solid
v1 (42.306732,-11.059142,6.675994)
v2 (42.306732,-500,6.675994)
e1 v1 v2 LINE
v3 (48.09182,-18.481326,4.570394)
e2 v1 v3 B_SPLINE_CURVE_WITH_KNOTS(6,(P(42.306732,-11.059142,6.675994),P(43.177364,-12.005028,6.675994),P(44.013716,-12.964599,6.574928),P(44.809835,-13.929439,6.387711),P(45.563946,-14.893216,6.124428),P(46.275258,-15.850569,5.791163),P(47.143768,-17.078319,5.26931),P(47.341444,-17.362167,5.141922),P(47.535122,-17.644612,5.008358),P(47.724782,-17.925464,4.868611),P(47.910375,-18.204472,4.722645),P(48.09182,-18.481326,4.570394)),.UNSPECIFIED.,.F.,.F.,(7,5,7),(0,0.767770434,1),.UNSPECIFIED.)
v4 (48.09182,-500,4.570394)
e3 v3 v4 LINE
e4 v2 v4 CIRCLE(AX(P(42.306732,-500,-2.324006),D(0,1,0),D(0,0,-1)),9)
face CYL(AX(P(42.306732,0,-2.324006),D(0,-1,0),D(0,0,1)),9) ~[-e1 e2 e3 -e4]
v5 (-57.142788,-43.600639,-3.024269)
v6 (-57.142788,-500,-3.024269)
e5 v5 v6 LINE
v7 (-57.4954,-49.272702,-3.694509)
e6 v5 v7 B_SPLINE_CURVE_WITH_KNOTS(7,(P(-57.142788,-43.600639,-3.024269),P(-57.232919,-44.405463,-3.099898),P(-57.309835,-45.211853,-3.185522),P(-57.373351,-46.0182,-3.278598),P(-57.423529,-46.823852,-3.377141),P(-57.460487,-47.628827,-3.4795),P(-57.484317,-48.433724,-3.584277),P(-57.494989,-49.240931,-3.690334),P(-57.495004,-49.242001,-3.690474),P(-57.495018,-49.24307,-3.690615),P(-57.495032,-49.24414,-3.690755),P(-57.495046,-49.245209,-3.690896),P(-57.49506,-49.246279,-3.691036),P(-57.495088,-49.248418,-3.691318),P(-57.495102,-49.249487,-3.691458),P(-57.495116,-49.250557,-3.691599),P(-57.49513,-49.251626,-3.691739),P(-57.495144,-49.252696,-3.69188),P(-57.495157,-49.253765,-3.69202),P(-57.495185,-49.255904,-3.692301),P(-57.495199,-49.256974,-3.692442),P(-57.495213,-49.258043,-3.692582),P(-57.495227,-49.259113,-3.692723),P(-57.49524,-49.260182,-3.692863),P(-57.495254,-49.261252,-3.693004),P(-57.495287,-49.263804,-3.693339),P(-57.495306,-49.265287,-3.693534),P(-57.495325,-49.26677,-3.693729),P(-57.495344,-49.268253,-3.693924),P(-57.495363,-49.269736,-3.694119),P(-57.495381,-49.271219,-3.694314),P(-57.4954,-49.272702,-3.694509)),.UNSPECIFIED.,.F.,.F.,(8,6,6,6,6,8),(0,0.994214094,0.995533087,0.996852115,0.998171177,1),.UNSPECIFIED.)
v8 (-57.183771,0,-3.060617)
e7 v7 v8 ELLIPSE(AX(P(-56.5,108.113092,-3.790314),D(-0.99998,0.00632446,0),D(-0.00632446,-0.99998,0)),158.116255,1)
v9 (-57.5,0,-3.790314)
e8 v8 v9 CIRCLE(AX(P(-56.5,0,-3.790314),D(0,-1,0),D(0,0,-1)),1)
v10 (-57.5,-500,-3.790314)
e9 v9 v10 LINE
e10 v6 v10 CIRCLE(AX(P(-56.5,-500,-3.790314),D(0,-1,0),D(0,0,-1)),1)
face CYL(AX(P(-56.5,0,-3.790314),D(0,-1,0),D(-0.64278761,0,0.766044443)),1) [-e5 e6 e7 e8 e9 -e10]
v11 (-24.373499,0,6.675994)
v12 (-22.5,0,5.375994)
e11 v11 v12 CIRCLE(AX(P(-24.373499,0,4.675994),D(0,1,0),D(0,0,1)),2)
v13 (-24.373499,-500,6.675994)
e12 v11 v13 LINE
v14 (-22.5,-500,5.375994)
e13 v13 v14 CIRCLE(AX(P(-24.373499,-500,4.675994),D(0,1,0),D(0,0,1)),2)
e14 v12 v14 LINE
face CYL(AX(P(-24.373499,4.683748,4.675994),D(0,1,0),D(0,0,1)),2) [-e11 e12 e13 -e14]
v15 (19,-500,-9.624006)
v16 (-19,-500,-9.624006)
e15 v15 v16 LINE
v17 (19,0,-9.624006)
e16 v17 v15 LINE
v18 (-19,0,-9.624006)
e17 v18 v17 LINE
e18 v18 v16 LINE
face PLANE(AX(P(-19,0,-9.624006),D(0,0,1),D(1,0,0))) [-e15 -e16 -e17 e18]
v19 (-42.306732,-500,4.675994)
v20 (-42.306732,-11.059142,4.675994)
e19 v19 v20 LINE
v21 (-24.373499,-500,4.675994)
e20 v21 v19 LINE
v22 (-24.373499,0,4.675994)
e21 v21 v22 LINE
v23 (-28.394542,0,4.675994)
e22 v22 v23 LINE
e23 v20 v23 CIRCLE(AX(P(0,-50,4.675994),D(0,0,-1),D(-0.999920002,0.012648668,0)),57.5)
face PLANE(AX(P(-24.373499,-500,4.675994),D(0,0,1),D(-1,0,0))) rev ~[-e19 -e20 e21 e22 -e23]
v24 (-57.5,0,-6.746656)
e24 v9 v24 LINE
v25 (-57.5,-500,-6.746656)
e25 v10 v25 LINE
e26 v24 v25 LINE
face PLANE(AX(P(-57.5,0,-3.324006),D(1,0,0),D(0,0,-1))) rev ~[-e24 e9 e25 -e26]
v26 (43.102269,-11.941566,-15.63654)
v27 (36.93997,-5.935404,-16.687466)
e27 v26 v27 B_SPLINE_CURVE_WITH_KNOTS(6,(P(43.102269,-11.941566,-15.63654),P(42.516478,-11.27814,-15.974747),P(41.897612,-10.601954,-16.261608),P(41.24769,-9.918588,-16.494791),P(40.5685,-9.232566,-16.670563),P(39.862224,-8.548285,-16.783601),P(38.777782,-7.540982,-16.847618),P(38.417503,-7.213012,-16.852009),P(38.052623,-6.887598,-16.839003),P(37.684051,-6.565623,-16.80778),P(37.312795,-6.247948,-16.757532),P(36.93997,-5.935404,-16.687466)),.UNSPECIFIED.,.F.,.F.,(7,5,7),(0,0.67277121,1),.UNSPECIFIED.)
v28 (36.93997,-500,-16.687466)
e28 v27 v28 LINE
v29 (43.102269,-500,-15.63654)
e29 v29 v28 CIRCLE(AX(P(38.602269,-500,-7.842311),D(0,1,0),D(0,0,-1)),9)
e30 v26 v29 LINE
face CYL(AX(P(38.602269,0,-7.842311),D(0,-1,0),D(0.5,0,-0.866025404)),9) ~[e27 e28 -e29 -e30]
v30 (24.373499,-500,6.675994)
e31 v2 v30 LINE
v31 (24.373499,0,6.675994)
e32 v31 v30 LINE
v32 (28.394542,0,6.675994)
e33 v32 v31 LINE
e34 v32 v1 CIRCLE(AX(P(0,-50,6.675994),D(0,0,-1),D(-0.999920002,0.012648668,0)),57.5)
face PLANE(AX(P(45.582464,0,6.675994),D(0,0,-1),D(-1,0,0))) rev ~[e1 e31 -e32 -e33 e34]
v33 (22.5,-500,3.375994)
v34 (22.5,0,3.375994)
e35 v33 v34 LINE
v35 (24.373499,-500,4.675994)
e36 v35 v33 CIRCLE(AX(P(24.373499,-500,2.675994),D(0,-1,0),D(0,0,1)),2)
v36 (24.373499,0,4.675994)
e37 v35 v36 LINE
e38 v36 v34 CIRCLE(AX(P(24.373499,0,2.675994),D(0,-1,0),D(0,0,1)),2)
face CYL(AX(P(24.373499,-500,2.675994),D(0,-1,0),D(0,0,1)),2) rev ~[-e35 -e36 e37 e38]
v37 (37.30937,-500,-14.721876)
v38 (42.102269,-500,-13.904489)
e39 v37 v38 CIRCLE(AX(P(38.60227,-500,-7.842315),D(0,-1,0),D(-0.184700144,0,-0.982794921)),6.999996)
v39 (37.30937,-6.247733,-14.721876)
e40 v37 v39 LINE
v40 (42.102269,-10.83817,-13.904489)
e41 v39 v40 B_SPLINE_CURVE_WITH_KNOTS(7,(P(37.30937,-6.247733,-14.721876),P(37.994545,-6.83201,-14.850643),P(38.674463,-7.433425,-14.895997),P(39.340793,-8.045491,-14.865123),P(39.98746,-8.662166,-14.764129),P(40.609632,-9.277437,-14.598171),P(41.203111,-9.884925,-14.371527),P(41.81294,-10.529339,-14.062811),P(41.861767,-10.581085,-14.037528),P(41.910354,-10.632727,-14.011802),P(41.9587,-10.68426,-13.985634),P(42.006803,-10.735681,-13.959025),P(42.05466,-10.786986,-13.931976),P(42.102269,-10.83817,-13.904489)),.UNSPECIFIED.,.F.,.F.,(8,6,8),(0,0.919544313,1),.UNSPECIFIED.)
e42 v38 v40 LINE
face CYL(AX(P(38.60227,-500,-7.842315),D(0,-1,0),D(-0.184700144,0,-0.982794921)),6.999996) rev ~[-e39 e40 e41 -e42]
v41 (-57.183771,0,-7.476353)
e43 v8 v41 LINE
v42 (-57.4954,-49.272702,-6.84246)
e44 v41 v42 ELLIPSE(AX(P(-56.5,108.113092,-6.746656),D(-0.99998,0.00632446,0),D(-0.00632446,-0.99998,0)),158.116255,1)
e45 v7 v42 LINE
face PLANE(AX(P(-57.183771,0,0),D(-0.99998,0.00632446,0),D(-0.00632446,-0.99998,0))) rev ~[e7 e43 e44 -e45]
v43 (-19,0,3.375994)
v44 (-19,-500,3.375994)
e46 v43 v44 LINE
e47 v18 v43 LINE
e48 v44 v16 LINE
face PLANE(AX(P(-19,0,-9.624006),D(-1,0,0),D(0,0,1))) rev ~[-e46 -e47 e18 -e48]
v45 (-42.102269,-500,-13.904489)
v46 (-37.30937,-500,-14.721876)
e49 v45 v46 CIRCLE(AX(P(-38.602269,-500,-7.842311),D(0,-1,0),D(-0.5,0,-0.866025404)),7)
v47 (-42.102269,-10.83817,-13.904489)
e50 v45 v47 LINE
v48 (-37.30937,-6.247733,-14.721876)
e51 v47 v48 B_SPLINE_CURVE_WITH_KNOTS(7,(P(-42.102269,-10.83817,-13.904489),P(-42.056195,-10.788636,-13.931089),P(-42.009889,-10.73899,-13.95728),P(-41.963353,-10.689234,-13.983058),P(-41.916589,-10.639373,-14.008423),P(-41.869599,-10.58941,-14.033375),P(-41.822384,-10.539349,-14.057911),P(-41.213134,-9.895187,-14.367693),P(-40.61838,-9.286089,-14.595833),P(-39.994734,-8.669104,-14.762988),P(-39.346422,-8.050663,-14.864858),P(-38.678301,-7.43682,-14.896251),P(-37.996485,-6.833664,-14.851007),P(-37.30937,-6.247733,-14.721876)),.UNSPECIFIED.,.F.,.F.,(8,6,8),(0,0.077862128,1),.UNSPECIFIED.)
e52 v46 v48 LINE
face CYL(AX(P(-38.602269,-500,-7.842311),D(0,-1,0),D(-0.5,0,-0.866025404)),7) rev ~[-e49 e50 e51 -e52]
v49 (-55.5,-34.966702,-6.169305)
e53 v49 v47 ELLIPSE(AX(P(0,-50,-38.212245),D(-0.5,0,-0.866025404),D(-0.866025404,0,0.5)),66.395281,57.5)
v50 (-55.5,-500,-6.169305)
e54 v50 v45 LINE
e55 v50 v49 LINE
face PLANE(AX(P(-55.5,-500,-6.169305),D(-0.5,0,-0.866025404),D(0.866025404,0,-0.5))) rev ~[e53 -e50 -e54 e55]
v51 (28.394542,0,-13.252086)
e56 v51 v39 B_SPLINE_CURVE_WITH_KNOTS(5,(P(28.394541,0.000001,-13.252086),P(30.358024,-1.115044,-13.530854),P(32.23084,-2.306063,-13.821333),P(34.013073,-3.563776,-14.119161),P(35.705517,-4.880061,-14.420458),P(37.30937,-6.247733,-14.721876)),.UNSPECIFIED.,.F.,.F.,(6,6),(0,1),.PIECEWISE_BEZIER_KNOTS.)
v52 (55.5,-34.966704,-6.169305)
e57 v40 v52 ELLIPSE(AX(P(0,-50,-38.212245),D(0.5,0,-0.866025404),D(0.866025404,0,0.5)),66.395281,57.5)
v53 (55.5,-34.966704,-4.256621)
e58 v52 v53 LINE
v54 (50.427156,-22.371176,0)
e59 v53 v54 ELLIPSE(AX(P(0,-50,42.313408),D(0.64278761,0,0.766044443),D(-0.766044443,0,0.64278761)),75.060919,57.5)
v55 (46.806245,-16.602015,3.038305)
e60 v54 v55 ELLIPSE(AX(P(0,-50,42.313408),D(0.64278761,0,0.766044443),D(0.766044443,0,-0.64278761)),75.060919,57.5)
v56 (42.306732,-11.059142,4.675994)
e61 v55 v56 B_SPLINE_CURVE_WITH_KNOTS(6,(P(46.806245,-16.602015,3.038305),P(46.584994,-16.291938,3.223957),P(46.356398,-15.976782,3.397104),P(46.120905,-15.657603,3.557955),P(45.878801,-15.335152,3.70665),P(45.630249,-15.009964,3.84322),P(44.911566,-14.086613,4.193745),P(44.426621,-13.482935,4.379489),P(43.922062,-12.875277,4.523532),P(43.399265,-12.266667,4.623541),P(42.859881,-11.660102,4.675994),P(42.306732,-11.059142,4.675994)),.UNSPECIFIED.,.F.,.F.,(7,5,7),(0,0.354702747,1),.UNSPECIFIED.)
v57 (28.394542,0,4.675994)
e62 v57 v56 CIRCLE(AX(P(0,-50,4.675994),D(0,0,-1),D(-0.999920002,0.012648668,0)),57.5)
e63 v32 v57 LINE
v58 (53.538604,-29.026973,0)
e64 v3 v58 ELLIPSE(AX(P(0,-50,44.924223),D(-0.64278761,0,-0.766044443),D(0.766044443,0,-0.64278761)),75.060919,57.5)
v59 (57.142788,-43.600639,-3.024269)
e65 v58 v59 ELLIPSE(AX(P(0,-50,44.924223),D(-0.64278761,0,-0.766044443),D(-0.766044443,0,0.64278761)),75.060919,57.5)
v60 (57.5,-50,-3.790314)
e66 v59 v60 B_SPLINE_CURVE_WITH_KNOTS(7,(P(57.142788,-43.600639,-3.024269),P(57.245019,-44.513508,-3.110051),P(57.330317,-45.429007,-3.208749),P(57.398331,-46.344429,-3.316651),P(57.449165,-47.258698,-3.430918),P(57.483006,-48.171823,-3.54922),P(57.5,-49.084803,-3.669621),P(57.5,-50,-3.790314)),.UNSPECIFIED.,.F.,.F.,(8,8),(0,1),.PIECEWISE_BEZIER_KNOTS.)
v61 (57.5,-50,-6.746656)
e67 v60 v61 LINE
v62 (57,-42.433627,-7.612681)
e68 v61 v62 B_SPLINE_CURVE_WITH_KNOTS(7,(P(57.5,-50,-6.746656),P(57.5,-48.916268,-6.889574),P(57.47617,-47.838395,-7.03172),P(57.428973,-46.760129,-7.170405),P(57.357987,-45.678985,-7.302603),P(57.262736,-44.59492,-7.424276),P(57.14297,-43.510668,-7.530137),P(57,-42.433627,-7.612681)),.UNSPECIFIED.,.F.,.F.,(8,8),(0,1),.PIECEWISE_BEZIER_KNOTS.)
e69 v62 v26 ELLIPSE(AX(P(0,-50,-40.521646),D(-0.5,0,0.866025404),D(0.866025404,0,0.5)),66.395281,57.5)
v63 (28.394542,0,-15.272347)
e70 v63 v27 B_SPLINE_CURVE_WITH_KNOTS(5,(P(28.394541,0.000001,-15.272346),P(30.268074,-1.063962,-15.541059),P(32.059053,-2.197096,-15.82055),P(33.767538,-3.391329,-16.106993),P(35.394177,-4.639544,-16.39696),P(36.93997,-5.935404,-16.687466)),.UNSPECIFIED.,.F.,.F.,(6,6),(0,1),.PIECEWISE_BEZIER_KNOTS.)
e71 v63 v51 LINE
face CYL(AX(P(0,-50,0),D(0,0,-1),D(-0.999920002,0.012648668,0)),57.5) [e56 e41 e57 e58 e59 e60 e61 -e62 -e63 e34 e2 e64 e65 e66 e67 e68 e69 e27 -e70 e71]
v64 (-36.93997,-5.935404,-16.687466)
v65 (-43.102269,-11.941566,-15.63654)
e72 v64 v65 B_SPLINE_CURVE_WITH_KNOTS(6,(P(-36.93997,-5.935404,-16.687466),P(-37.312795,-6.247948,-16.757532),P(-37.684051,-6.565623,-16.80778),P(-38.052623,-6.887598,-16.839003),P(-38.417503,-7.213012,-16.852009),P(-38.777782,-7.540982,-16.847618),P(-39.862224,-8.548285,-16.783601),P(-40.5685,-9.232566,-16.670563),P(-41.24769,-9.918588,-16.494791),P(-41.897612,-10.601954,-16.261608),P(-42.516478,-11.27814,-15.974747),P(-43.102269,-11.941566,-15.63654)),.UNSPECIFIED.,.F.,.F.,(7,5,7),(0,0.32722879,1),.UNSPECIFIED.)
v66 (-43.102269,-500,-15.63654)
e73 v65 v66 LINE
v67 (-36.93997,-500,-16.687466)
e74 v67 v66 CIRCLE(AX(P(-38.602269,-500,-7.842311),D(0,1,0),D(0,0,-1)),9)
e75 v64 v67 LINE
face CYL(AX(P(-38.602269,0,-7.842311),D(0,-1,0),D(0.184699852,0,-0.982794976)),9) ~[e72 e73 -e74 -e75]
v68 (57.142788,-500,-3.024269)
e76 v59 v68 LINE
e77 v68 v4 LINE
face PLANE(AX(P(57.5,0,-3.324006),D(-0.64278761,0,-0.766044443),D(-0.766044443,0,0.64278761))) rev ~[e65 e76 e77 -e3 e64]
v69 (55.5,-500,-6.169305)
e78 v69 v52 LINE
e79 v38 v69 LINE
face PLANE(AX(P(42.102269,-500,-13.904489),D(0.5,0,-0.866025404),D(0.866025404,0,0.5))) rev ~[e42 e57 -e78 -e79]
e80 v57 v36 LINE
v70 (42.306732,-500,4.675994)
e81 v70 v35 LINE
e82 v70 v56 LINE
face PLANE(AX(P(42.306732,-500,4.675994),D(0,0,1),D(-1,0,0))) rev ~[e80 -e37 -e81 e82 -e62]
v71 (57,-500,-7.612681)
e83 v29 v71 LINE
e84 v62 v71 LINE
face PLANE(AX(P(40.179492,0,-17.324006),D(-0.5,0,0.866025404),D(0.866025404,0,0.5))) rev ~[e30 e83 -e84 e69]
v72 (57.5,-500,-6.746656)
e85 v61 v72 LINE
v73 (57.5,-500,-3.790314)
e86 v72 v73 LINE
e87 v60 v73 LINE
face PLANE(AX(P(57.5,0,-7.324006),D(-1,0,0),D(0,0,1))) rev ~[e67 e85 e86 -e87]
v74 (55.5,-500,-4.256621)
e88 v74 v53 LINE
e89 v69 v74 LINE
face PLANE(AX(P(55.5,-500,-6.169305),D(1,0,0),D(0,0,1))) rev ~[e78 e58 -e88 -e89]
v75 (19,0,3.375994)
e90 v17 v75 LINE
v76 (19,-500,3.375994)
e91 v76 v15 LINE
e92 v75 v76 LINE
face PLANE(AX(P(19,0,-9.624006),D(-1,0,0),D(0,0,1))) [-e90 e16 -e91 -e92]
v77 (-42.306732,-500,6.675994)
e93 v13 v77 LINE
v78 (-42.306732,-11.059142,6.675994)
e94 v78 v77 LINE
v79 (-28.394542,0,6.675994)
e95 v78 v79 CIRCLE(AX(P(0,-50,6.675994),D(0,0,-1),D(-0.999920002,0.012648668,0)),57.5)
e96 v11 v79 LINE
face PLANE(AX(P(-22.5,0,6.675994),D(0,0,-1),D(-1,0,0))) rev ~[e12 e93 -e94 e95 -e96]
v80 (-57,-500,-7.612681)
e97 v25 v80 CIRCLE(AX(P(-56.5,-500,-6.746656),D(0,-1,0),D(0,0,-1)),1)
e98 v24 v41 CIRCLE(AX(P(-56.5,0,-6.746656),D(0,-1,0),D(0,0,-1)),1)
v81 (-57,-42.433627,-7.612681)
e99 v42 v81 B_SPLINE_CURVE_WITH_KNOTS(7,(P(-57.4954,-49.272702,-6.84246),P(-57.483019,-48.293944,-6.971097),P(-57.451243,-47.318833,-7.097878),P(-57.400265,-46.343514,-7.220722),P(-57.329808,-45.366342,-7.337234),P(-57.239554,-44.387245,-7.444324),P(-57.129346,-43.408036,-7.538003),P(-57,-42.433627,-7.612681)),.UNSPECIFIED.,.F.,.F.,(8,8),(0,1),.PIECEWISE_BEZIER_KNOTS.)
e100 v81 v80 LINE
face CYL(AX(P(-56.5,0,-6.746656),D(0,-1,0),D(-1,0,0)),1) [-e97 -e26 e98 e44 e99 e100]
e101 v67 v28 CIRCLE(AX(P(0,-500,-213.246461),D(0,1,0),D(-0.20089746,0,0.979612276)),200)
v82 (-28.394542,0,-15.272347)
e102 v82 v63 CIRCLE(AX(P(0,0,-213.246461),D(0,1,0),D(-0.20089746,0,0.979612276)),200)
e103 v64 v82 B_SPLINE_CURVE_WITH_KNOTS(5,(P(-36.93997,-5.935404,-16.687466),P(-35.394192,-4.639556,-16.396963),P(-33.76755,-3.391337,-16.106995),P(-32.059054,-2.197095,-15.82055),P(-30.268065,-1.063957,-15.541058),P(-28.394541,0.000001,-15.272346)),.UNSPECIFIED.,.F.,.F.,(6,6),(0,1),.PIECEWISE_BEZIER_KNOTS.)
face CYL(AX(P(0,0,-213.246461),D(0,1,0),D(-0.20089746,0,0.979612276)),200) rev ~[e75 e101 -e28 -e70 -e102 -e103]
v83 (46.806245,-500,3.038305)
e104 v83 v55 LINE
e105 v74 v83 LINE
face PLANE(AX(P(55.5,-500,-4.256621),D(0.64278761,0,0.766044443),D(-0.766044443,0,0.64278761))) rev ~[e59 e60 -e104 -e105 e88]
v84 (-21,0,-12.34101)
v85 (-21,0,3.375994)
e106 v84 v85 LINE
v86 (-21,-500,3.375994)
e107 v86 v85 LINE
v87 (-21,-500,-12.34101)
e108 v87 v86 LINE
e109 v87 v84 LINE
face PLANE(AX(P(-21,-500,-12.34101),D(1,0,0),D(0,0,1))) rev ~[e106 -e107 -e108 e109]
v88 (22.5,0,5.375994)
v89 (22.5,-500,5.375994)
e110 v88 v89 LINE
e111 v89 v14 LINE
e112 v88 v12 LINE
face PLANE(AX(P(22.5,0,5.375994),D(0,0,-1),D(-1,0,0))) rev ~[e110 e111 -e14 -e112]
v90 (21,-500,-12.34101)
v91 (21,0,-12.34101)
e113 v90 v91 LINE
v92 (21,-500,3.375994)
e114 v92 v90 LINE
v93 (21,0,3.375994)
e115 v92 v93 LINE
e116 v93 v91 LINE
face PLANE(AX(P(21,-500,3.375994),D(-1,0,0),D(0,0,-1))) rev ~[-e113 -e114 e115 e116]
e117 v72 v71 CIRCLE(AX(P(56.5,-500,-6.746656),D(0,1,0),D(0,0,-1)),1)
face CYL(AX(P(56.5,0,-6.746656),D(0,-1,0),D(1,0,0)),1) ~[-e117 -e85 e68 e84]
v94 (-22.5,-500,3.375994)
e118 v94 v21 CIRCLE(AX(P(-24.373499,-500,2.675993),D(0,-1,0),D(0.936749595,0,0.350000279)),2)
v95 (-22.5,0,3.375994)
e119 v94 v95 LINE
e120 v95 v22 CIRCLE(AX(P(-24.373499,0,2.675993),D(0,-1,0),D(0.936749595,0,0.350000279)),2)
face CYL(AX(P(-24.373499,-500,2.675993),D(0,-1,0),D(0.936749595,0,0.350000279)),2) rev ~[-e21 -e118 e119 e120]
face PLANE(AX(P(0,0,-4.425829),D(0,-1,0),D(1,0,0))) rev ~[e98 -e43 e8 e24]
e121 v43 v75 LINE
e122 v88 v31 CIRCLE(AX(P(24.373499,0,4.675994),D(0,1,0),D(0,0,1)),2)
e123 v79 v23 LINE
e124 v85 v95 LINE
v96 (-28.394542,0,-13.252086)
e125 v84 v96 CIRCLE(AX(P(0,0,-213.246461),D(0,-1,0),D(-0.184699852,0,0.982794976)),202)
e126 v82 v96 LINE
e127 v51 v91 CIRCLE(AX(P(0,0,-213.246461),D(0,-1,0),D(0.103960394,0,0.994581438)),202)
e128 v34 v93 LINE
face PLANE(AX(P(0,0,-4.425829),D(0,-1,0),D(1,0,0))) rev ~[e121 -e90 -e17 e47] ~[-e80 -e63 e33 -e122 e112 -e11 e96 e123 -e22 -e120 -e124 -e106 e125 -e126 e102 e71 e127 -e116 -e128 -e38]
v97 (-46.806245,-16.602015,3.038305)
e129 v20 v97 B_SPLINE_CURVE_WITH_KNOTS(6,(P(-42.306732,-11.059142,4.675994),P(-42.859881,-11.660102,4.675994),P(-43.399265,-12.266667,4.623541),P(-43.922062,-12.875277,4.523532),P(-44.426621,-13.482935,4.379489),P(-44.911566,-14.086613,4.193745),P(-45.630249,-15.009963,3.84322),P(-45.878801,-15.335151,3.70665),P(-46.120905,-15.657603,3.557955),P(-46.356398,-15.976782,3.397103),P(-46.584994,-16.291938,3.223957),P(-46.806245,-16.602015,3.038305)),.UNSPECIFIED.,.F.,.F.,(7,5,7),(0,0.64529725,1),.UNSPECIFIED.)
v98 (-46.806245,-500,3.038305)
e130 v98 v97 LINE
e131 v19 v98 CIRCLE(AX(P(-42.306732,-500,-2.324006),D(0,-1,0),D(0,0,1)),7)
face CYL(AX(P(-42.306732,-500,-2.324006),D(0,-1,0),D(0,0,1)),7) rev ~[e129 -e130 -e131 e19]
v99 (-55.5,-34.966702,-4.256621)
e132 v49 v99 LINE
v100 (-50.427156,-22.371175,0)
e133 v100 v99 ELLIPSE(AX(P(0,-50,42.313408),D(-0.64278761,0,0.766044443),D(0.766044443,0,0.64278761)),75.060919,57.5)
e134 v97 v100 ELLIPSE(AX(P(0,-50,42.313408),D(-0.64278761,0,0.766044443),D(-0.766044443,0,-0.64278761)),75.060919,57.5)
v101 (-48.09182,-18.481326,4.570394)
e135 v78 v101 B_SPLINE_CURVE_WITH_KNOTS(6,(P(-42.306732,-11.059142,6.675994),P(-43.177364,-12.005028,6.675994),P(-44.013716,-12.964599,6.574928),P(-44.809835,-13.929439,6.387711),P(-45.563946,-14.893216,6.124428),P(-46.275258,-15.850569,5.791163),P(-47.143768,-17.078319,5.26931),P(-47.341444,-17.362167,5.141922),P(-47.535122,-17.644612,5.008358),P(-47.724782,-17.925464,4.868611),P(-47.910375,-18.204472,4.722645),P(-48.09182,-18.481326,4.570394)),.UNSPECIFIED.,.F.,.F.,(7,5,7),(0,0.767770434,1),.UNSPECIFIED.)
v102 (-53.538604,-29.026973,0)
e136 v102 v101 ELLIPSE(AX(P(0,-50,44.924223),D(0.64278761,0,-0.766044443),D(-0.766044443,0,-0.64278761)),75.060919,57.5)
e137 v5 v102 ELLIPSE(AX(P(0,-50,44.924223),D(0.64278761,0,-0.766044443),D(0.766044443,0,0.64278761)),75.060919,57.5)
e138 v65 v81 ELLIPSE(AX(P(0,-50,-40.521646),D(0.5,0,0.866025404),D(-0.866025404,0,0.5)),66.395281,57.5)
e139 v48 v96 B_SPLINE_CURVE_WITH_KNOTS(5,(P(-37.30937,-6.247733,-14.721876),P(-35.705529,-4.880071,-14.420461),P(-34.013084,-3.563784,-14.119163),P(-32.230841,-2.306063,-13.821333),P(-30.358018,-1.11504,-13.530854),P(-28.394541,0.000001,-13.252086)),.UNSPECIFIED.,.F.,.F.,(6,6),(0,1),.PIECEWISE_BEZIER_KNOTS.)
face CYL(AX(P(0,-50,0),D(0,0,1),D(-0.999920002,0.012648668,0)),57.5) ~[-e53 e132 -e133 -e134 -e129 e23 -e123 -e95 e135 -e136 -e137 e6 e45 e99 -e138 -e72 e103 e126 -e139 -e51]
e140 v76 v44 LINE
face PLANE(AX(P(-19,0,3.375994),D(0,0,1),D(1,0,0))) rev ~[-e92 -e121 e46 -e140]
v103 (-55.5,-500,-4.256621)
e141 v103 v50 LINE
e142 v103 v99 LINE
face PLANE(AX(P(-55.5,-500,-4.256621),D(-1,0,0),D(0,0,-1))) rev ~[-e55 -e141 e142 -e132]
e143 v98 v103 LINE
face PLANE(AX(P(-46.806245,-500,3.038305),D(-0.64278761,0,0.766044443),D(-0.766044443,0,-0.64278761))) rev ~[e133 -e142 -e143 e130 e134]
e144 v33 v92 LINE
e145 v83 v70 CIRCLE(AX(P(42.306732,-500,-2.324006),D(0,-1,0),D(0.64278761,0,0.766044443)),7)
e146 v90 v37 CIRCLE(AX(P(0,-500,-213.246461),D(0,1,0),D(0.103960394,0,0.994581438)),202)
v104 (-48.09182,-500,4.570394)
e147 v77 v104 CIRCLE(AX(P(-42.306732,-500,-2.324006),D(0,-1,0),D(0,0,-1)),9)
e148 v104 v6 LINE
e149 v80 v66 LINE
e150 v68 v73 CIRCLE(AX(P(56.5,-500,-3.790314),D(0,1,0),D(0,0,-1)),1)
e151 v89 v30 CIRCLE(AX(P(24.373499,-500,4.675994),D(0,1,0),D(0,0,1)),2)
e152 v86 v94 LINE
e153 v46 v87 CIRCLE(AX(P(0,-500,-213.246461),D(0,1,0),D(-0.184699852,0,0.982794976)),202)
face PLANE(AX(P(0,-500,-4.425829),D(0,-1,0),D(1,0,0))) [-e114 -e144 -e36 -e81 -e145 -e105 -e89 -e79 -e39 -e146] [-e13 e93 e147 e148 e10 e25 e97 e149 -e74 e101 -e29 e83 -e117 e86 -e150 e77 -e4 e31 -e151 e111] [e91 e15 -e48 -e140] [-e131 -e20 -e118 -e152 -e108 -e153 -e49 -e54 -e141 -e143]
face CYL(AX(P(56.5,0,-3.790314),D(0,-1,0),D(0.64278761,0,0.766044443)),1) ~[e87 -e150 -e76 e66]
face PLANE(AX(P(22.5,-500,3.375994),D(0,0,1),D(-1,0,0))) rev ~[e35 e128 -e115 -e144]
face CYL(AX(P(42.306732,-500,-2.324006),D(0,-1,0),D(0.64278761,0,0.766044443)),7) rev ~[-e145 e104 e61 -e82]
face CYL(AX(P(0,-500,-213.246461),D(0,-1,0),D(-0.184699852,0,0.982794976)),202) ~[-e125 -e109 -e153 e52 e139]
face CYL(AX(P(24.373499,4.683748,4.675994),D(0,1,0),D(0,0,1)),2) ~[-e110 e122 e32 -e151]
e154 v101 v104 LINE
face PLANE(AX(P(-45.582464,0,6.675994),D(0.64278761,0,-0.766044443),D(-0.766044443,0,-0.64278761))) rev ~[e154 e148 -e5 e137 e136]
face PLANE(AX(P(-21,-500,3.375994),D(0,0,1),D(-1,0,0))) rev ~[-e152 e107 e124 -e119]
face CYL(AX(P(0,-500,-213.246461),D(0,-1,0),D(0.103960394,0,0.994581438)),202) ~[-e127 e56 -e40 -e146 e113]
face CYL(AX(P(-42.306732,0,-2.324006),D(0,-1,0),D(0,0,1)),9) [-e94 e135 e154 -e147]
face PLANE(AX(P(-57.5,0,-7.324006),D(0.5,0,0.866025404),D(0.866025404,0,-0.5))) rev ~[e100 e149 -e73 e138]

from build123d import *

# Parameters (mm, degrees)
F2_DEPTH       = 500
F1_W           = 38
F1_H           = 13
F3_DEPTH       = 600
F4_T1_DEPTH    = 509.3674969976
F5_R           = 9
F6_R           = 1
F8_DEPTH       = 500.001
F10_DEPTH      = 16.8433111076
F10_DEPTH_BACK = 25


# Not quite as in the source:
# - a fillet or chamfer that OpenCascade refuses, or shapes differently, is made with other operations: its cross-section is extruded or revolved along the edge and cut away or added
# - ends of sketch curves that miss each other by under 0.0002 mm in the source are joined


with BuildPart() as f2:
    # F0 (on Front) → F2 (new body)
    with BuildSketch(Plane.XZ):
        with BuildLine():
            Line((22.5, 5.3759940737), (0, 5.3759940737))
            Line((0, 5.3759940737), (-22.5, 5.3759940737))
            Line((-22.5, 5.3759940737), (-22.5, 6.6759940737))
            Line((-22.5, 6.6759940737), (-45.5824640741, 6.6759940737))
            Line((-45.5824640741, 6.6759940737), (-57.5, -3.3240059263))
            Line((-57.5, -3.3240059263), (-57.5, -7.3240059263))
            Line((-57.5, -7.3240059263), (-40.1794919243, -17.3240059263))
            ThreePointArc((-40.1794919243, -17.3240059263), (0, -13.2464610679), (40.1794919243, -17.3240059263))
            Line((40.1794919243, -17.3240059263), (57.5, -7.3240059263))
            Line((57.5, -7.3240059263), (57.5, -3.3240059263))
            Line((57.5, -3.3240059263), (45.5824640741, 6.6759940737))
            Line((45.5824640741, 6.6759940737), (22.5, 6.6759940737))
            Line((22.5, 6.6759940737), (22.5, 5.3759940737))
        make_face()
    extrude(amount=F2_DEPTH)

    # F1 (on face) → F3 (cut)
    with BuildSketch(Plane.XZ):
        with Locations((0, -3.1240059263)):
            Rectangle(F1_W, F1_H)
    extrude(amount=F3_DEPTH, mode=Mode.SUBTRACT)

    # F4: fillet of radius 2 on 2 edges, made by hand

    # F4_s2 → F4_t1 (cut)
    with BuildSketch(Plane.XZ.offset(-4.6837484988)):
        with BuildLine():
            ThreePointArc((-24.3734993995, 6.6759940737), (-23.2333239744, 6.3191617462), (-22.5, 5.3759940737))
            Line((-22.5, 5.3759940737), (-22.5, 6.6759940737))
            Line((-22.5, 6.6759940737), (-24.3734993995, 6.6759940737))
        make_face()
        with BuildLine():
            ThreePointArc((24.3734993995, 6.6759940737), (23.2333239744, 6.3191617462), (22.5, 5.3759940737))
            Line((22.5, 5.3759940737), (22.5, 6.6759940737))
            Line((22.5, 6.6759940737), (24.3734993995, 6.6759940737))
        make_face()
    extrude(amount=F4_T1_DEPTH, mode=Mode.SUBTRACT)

    # F5
    f5_edges = [f2.edges().sort_by_distance(p)[0] for p in [
        (-45.582464, -250, 6.675994),
        (-40.179492, -250, -17.324006),
        (40.179492, -250, -17.324006),
        (45.582464, -250, 6.675994),
    ]]
    fillet(f5_edges, radius=F5_R)

    # F6
    f6_edges = [f2.edges().sort_by_distance(p)[0] for p in [
        (57.5, -250, -3.324006),
        (57.5, -250, -7.324006),
        (-57.5, -250, -7.324006),
        (-57.5, -250, -3.324006),
    ]]
    fillet(f6_edges, radius=F6_R)

    # F7 (on face) → F8 (cut, through all)
    with BuildSketch(Plane.XZ.offset(500)):
        with BuildLine():
            ThreePointArc((-42.1022688854, -13.9044885758), (-39.7790672738, -14.7426835793), (-37.3093702039, -14.7218755322))
            ThreePointArc((-37.3093702039, -14.7218755322), (-29.1789784784, -13.3650277579), (-20.9999997169, -12.3410102235))
            Line((-20.9999997169, -12.3410102235), (-20.9999997169, 3.3759940737))
            Line((-20.9999997169, 3.3759940737), (-22.5, 3.3759940737))
            ThreePointArc((-22.5, 3.3759940737), (-23.2333240923, 4.3191614627), (-24.3734993995, 4.67599366))
            Line((-24.3734993995, 4.67599366), (-42.3067319657, 4.67599366))
            ThreePointArc((-42.3067319657, 4.67599366), (-44.7008728275, 4.2538420304), (-46.8062449676, 3.0383048586))
            Line((-46.8062449676, 3.0383048586), (-55.4999995863, -4.2566214356))
            Line((-55.4999995863, -4.2566214356), (-55.4999995863, -6.1693051491))
            Line((-55.4999995863, -6.1693051491), (-42.1022688854, -13.9044885758))
        make_face()
        with BuildLine():
            Line((20.9999997169, 3.3759940737), (20.9999997169, -12.3410102235))
            ThreePointArc((20.9999997169, -12.3410102235), (29.1789784784, -13.3650277579), (37.3093702039, -14.7218755322))
            ThreePointArc((37.3093702039, -14.7218755322), (39.7790673581, -14.7426840737), (42.1022691362, -13.9044890102))
            Line((42.1022691362, -13.9044890102), (55.5000000879, -6.1693054387))
            Line((55.5000000879, -6.1693054387), (55.5000000879, -4.2566212017))
            Line((55.5000000879, -4.2566212017), (46.8062452899, 3.0383052428))
            ThreePointArc((46.8062452899, 3.0383052428), (44.700872999, 4.2538425017), (42.3067319657, 4.6759941615))
            Line((42.3067319657, 4.6759941615), (24.3734993995, 4.6759941615))
            ThreePointArc((24.3734993995, 4.6759941615), (23.2333239494, 4.3191618064), (22.5, 3.3759940737))
            Line((22.5, 3.3759940737), (20.9999997169, 3.3759940737))
        make_face()
    extrude(amount=-F8_DEPTH, mode=Mode.SUBTRACT)

    # F9 (on Top) → F10 (cut, two sides)
    with BuildSketch(Plane.XY) as f10_sk:
        with BuildLine():
            ThreePointArc((-57.495400138, -49.2727015938), (0.3636564761, 7.498850023), (57.5, -50))
            Line((57.5, -50), (57.8162293472, 0))
            Line((57.8162293472, 0), (57.8162293472, 30))
            Line((57.8162293472, 30), (-57.1837706528, 30))
            Line((-57.1837706528, 30), (-57.1837706528, 0))
            Line((-57.1837706528, 0), (-57.495400138, -49.2727015938))
        make_face()
    extrude(amount=-F10_DEPTH, mode=Mode.SUBTRACT)
    extrude(f10_sk.sketch, amount=F10_DEPTH_BACK, mode=Mode.SUBTRACT)


solid = f2.part
